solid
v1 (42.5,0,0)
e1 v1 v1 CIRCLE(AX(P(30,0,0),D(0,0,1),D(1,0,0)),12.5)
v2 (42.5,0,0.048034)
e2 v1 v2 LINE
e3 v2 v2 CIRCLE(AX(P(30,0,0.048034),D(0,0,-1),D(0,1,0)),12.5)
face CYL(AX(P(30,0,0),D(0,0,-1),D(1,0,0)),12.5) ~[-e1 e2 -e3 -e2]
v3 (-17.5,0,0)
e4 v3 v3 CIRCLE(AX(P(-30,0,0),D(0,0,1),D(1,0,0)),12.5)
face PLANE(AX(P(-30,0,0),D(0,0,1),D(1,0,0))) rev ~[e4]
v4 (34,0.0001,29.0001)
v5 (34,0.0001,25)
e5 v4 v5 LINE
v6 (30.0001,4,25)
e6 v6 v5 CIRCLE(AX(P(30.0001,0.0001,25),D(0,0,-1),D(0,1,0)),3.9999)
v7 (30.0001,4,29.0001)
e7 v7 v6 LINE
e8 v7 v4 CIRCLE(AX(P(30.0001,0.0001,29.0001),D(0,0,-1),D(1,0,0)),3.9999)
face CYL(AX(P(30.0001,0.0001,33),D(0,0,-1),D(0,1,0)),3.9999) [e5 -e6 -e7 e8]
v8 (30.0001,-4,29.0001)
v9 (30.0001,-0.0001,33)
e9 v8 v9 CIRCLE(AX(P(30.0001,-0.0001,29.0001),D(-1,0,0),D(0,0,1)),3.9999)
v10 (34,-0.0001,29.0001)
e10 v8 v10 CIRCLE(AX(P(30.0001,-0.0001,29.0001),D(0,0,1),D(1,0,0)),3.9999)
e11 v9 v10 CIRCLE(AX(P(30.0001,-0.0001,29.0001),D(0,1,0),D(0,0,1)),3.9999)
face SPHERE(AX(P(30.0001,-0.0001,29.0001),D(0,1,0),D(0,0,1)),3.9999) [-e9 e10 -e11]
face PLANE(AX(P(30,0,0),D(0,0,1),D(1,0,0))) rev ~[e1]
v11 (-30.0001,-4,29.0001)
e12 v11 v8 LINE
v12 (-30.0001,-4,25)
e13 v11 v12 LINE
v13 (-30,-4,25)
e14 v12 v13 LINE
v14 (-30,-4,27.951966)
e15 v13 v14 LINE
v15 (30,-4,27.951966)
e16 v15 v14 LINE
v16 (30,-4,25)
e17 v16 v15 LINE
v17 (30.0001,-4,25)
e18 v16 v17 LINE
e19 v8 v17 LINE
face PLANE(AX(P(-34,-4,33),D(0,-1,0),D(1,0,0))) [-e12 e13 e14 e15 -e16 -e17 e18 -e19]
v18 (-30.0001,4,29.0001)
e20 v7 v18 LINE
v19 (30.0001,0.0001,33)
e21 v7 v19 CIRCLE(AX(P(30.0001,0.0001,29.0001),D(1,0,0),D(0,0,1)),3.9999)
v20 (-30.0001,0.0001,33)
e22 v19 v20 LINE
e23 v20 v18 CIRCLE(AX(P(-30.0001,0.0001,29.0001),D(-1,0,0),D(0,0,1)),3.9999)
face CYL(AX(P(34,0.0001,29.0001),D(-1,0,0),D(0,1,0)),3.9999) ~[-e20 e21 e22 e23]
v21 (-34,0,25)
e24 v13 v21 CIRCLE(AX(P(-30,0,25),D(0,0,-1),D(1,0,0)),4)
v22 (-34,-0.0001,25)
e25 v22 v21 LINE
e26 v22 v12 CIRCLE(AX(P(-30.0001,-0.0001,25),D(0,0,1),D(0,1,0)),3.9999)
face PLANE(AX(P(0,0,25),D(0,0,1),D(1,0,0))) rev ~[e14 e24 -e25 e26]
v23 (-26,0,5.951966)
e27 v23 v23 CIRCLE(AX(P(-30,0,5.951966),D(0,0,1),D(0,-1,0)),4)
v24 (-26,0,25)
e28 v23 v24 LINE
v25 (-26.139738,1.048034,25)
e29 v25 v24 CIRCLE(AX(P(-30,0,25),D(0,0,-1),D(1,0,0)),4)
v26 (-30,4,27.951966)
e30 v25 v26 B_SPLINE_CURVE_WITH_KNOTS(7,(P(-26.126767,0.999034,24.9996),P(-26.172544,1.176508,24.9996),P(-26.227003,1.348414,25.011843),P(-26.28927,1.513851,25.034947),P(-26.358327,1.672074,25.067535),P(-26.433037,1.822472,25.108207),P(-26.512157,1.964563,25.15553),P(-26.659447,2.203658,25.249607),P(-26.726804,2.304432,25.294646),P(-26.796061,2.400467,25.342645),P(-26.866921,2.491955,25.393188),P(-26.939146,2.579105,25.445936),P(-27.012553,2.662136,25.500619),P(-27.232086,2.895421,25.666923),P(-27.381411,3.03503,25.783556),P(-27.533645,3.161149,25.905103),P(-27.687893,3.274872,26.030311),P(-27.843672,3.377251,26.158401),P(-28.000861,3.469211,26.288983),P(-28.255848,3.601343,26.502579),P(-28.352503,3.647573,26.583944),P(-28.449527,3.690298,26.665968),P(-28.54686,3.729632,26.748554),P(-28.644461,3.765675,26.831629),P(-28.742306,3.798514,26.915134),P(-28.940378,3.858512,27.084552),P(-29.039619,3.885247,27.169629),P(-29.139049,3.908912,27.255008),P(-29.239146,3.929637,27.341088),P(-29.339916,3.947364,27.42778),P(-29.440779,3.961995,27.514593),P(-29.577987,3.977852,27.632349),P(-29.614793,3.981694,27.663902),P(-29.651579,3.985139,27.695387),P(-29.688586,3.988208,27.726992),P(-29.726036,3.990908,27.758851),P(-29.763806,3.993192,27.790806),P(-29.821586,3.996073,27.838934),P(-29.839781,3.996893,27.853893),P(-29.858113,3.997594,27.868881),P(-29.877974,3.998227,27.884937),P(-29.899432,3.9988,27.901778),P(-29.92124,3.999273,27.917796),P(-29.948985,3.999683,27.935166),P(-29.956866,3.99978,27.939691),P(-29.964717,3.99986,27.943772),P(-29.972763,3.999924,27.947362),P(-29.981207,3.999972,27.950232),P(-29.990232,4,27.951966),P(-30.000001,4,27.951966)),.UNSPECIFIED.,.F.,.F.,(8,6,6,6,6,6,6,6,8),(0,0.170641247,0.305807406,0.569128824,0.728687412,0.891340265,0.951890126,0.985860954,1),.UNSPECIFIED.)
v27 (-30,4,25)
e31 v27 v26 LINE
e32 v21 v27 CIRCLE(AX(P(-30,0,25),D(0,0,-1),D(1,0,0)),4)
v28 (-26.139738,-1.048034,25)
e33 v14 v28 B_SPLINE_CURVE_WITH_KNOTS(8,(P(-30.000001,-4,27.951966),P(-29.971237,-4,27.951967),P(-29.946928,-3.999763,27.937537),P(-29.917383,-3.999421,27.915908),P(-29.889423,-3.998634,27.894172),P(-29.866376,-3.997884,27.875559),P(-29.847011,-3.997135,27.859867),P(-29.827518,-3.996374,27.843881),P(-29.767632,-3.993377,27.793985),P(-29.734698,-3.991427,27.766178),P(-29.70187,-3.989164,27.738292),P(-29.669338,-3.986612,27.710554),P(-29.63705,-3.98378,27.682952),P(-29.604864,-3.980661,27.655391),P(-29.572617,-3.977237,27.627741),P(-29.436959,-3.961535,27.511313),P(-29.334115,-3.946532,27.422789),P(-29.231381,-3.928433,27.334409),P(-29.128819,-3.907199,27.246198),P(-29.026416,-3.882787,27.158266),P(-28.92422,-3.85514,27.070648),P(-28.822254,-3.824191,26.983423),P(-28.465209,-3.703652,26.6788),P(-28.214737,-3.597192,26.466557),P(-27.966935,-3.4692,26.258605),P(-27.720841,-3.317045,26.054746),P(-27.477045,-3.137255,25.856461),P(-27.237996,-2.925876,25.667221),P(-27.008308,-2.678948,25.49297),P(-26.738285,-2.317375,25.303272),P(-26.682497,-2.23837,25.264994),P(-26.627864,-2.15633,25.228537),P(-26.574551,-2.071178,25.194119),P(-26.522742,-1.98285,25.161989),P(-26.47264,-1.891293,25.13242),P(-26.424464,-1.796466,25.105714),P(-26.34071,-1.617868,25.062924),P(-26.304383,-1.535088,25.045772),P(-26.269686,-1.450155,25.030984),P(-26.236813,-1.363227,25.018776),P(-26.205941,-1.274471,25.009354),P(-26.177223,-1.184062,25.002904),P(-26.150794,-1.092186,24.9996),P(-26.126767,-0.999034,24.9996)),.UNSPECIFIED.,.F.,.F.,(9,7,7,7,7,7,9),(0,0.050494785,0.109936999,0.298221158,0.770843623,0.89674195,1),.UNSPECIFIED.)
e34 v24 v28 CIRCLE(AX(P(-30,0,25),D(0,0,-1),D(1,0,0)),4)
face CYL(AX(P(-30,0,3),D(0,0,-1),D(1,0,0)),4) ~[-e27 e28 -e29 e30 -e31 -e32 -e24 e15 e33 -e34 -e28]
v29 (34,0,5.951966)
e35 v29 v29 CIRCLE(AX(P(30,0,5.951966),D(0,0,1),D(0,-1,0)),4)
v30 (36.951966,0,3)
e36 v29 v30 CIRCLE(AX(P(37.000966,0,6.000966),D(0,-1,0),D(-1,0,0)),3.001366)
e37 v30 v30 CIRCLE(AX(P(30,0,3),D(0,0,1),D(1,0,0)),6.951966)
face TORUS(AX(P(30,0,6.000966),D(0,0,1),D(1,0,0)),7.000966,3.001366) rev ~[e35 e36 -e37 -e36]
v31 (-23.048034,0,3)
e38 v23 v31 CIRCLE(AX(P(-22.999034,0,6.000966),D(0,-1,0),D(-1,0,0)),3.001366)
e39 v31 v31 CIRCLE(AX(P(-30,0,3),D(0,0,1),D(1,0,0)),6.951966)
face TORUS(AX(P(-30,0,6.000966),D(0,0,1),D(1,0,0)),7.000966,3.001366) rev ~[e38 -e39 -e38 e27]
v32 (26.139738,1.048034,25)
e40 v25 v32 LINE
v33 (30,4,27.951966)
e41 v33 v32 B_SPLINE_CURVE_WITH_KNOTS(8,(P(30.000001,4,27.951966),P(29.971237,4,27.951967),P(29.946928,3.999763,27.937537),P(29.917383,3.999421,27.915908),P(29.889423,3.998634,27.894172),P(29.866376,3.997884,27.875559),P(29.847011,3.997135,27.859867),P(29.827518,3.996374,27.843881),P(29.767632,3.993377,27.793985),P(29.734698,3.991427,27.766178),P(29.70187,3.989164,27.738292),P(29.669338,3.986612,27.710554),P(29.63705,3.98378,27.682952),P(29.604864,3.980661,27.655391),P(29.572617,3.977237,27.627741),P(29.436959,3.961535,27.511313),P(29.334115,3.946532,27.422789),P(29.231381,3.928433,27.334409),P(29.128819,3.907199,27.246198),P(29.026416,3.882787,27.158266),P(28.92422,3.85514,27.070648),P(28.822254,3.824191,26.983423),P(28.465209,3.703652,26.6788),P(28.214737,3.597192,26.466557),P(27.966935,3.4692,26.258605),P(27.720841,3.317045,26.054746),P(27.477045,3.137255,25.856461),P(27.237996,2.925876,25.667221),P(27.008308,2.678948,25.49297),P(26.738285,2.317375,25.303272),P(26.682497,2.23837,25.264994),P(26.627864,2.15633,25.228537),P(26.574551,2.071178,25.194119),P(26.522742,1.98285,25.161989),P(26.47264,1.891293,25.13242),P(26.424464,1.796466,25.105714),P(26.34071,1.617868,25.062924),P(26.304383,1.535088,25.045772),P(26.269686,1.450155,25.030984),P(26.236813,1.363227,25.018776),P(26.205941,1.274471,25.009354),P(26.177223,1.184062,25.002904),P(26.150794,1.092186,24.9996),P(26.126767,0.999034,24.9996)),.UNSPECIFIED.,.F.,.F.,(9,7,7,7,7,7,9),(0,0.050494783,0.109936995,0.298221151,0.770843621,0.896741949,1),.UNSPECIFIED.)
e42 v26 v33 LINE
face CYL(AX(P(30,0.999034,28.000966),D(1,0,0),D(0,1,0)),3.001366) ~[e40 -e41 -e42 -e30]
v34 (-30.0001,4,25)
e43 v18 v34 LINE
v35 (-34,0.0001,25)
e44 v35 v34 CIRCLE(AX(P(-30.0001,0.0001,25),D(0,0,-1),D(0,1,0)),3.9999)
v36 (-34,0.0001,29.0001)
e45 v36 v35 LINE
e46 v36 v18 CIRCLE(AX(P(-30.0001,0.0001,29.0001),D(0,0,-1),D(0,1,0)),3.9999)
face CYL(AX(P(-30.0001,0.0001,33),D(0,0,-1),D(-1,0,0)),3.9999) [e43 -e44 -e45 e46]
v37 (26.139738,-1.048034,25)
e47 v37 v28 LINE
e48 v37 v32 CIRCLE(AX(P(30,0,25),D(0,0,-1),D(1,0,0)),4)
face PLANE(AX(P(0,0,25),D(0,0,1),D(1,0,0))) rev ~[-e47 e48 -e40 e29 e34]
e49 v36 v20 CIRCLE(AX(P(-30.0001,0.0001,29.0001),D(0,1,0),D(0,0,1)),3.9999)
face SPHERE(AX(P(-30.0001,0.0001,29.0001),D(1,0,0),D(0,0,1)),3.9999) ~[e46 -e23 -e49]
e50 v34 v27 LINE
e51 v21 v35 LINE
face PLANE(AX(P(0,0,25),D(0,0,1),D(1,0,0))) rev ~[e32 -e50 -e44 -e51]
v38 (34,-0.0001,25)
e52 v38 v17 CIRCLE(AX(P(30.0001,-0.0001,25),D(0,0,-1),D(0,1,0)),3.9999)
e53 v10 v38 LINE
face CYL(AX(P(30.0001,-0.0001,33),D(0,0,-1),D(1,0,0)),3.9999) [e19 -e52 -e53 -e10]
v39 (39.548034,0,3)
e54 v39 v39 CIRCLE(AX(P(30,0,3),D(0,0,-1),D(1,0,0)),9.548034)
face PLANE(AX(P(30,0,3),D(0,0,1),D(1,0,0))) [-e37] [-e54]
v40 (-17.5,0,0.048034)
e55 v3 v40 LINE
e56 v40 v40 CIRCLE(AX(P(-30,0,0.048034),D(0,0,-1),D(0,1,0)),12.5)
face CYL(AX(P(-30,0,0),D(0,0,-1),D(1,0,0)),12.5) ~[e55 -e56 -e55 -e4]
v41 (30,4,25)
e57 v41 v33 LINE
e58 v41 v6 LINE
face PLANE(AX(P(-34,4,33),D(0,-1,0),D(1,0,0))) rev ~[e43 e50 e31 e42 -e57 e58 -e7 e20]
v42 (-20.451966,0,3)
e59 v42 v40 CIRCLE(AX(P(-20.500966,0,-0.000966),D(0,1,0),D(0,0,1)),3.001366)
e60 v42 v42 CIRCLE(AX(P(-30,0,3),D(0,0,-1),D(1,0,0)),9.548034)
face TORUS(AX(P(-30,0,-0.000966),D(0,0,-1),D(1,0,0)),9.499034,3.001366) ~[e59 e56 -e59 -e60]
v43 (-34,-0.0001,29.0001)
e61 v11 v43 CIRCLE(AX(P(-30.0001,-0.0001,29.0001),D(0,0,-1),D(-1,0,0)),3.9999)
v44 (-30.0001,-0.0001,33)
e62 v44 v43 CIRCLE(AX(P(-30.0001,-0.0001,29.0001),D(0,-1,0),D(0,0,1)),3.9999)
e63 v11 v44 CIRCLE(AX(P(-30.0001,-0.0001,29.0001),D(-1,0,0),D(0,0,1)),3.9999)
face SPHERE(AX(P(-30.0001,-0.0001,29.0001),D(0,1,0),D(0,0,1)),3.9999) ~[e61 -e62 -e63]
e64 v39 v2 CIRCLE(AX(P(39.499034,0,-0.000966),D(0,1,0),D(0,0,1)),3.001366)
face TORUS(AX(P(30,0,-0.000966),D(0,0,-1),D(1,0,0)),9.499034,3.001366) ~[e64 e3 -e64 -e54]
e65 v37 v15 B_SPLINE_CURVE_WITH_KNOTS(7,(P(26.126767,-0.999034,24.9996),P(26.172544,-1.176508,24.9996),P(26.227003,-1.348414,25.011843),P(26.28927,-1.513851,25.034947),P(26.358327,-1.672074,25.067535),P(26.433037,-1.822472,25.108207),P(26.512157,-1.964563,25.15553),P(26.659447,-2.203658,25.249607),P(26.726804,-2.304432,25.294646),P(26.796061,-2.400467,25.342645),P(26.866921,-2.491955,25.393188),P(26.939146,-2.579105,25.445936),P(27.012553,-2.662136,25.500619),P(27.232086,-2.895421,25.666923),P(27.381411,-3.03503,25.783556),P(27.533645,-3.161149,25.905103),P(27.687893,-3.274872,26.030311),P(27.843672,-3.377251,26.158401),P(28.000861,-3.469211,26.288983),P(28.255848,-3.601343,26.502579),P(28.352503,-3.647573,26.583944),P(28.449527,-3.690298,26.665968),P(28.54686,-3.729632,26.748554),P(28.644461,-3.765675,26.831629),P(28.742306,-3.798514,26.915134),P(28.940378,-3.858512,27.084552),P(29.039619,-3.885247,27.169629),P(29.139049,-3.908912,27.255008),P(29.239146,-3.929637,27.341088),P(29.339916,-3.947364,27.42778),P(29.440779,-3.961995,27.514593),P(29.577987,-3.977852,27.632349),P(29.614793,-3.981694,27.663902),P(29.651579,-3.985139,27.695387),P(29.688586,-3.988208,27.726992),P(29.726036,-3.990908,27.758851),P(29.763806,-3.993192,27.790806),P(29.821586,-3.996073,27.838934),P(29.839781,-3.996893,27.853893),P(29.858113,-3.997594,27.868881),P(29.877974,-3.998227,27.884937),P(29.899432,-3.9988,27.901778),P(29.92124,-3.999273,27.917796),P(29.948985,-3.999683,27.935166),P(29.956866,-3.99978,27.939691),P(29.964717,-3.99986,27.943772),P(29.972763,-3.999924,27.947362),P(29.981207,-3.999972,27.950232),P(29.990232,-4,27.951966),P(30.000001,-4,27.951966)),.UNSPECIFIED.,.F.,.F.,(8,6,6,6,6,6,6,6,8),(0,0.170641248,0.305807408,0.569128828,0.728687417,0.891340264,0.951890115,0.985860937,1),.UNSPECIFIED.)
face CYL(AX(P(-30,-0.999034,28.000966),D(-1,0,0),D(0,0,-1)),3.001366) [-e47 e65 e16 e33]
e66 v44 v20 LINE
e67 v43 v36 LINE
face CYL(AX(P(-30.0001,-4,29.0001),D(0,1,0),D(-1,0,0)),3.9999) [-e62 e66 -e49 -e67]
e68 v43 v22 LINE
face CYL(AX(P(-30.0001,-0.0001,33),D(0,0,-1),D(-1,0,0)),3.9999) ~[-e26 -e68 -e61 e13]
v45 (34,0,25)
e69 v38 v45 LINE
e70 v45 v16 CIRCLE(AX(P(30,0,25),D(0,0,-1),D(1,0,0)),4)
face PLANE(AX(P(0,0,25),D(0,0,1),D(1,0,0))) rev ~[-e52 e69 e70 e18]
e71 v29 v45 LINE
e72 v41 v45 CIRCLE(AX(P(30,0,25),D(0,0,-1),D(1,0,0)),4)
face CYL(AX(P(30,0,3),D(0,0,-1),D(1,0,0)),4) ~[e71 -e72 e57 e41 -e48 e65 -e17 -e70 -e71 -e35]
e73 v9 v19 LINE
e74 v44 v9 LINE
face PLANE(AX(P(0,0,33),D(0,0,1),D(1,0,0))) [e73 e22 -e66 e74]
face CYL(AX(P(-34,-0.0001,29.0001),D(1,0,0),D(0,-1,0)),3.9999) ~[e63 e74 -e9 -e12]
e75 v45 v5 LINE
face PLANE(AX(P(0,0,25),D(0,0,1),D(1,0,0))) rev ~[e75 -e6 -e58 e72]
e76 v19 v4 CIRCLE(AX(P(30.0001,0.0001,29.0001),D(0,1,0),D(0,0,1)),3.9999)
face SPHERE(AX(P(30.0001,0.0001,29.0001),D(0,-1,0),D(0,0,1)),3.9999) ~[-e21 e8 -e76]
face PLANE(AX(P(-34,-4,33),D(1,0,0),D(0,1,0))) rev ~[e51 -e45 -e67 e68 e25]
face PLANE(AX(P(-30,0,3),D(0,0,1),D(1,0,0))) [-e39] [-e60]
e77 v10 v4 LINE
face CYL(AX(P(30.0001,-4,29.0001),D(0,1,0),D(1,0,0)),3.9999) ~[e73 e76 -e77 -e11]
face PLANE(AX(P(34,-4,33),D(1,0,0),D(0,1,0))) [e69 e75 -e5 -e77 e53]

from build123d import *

# Parameters (mm, degrees)
F0_R         = 12.5
F1_DEPTH     = 3
F2_R         = 4
F3_DEPTH     = 30
F4_W         = 68
F4_H         = 8
F5_DEPTH     = 8
F6_R         = 3.9999
F7_T8_DEPTH  = 60
F7_S9_R      = 4
F7_T10_DEPTH = 32
F7_S11_R     = 4
F7_T12_DEPTH = 32
F7_T16_DEPTH = 60
F7_S17_R     = 4
F7_T18_DEPTH = 32
F7_S19_R     = 4
F7_T20_DEPTH = 32


# Not quite as in the source:
# - a fillet or chamfer that OpenCascade refuses, or shapes differently, is made with other operations: its cross-section is extruded or revolved along the edge and cut away or added
# - two fillets or chamfers of one size are made in one step
# - a fillet or chamfer is up to 0.001 mm smaller than in the source, because OpenCascade refuses the exact size


with BuildPart() as f1:
    # F0 (on Top) → F1 (new body)
    with BuildSketch(Plane.XY):
        with Locations((-30, 0)):
            Circle(F0_R)
    extrude(amount=F1_DEPTH)

    # F2 (on face) → F3 (join)
    with BuildSketch(Plane.XY.offset(3)):
        with Locations((-30, 0)):
            Circle(F2_R)
    extrude(amount=F3_DEPTH)



with BuildPart() as f1b:
    # F0 (on Top) → F1, piece 2 (new body)
    with BuildSketch(Plane.XY):
        with Locations((30, 0)):
            Circle(F0_R)
    extrude(amount=F1_DEPTH)

    # F2 (on face) → F3, piece 2 (join)
    with BuildSketch(Plane.XY.offset(3)):
        with Locations((30, 0)):
            Circle(F2_R)
    extrude(amount=F3_DEPTH)


with BuildPart() as f1_1:
    add(f1.part)

    add(f1b.part)  # F5 merges F1b
    # F4 (on face) → F5 (join)
    with BuildSketch(Plane.XY.offset(33)):
        Rectangle(F4_W, F4_H)
    extrude(amount=-F5_DEPTH)

    # F6 (radius 4 in the source; OpenCascade refuses exactly that, so slightly less here)
    f6_edges = [f1_1.edges().sort_by_distance(p)[0] for p in [
        (34, 0, 33),
        (0, 4, 33),
        (-34, 0, 33),
        (0, -4, 33),
        (34, -4, 29),
        (34, 4, 29),
        (-34, -4, 29),
        (-34, 4, 29),
    ]]
    fillet(f6_edges, radius=F6_R)

    # F7: fillet of radius 3 on 6 edges, made by hand

    # F7_s1 → F7_t2 (revolve)
    with BuildSketch(Plane.XZ):
        with BuildLine():
            ThreePointArc((33.9996, 6.0009656854), (34.8786796564, 3.8786796564), (37.0009656854, 2.9996))
            Line((37.0009656854, 2.9996), (37.0009656854, 2.6994634315))
            ThreePointArc((37.0009656854, 2.6994634315), (35.5004828427, 2.6998634315), (34, 2.6998634315))
            Line((34, 2.6998634315), (33.6998634315, 3))
            ThreePointArc((33.6998634315, 3), (33.6998634315, 4.5004828427), (33.6994634315, 6.0009656854))
            Line((33.6994634315, 6.0009656854), (33.9996, 6.0009656854))
        make_face()
    revolve(axis=Axis((30, 0, 3), (0, 0, 1)))

    # F7_s3 → F7_t4 (revolve)
    with BuildSketch(Plane.XZ):
        with BuildLine():
            ThreePointArc((-26.0004, 6.0009656854), (-25.1213203436, 3.8786796564), (-22.9990343146, 2.9996))
            Line((-22.9990343146, 2.9996), (-22.9990343146, 2.6994634315))
            ThreePointArc((-22.9990343146, 2.6994634315), (-24.4995171573, 2.6998634315), (-26, 2.6998634315))
            Line((-26, 2.6998634315), (-26.3001365685, 3))
            ThreePointArc((-26.3001365685, 3), (-26.3001365685, 4.5004828427), (-26.3005365685, 6.0009656854))
            Line((-26.3005365685, 6.0009656854), (-26.0004, 6.0009656854))
        make_face()
    revolve(axis=Axis((-30, 0, 3), (0, 0, 1)))


with BuildPart() as f7_tool6:
    # F7_s7 → F7_t8 (new body)
    with BuildSketch(Plane.YZ.offset(-30)):
        with BuildLine():
            ThreePointArc((-0.9990343146, 24.9996), (-3.1213203436, 25.8786796564), (-4.0004, 28.0009656854))
            Line((-4.0004, 28.0009656854), (-4.3005365685, 28.0009656854))
            ThreePointArc((-4.3005365685, 28.0009656854), (-4.3001365685, 26.5004828427), (-4.3001365685, 25))
            Line((-4.3001365685, 25), (-4, 24.6998634315))
            ThreePointArc((-4, 24.6998634315), (-2.4995171573, 24.6998634315), (-0.9990343146, 24.6994634315))
            Line((-0.9990343146, 24.6994634315), (-0.9990343146, 24.9996))
        make_face()
    extrude(amount=F7_T8_DEPTH)

    # F7_s9 → F7_t10 (cut, symmetric)
    with BuildSketch(Plane.XY.offset(26.4)):
        with Locations((30, 0)):
            Circle(F7_S9_R)
    extrude(amount=F7_T10_DEPTH, both=True, mode=Mode.SUBTRACT)

    # F7_s11 → F7_t12 (cut, symmetric)
    with BuildSketch(Plane.XY.offset(26.4)):
        with Locations((-30, 0)):
            Circle(F7_S11_R)
    extrude(amount=F7_T12_DEPTH, both=True, mode=Mode.SUBTRACT)


with BuildPart() as f1_2:
    add(f1_1.part)

    # F7_t5: cut F7_tool6
    add(f7_tool6.part, mode=Mode.SUBTRACT)


with BuildPart() as f7_tool14:
    # F7_s15 → F7_t16 (new body)
    with BuildSketch(Plane.YZ.offset(30)):
        with BuildLine():
            ThreePointArc((4.0004, 28.0009656854), (3.1213203436, 25.8786796564), (0.9990343146, 24.9996))
            Line((0.9990343146, 24.9996), (0.9990343146, 24.6994634315))
            ThreePointArc((0.9990343146, 24.6994634315), (2.4995171573, 24.6998634315), (4, 24.6998634315))
            Line((4, 24.6998634315), (4.3001365685, 25))
            ThreePointArc((4.3001365685, 25), (4.3001365685, 26.5004828427), (4.3005365685, 28.0009656854))
            Line((4.3005365685, 28.0009656854), (4.0004, 28.0009656854))
        make_face()
    extrude(amount=-F7_T16_DEPTH)

    # F7_s17 → F7_t18 (cut, symmetric)
    with BuildSketch(Plane.XY.offset(26.4)):
        with Locations((30, 0)):
            Circle(F7_S17_R)
    extrude(amount=F7_T18_DEPTH, both=True, mode=Mode.SUBTRACT)

    # F7_s19 → F7_t20 (cut, symmetric)
    with BuildSketch(Plane.XY.offset(26.4)):
        with Locations((-30, 0)):
            Circle(F7_S19_R)
    extrude(amount=F7_T20_DEPTH, both=True, mode=Mode.SUBTRACT)


with BuildPart() as f1_3:
    add(f1_2.part)

    # F7_t13: cut F7_tool14
    add(f7_tool14.part, mode=Mode.SUBTRACT)

    # F7_s21 → F7_t22 (revolve, cut)
    with BuildSketch(Plane.XZ):
        with BuildLine():
            ThreePointArc((39.4990343146, 3.0004), (41.6213203436, 2.1213203436), (42.5004, -0.0009656854))
            Line((42.5004, -0.0009656854), (42.8005365685, -0.0009656854))
            ThreePointArc((42.8005365685, -0.0009656854), (42.8001365685, 1.4995171573), (42.8001365685, 3))
            Line((42.8001365685, 3), (42.5, 3.3001365685))
            ThreePointArc((42.5, 3.3001365685), (40.9995171573, 3.3001365685), (39.4990343146, 3.3005365685))
            Line((39.4990343146, 3.3005365685), (39.4990343146, 3.0004))
        make_face()
    revolve(axis=Axis((30, 0, 3), (0, 0, 1)), mode=Mode.SUBTRACT)

    # F7_s23 → F7_t24 (revolve, cut)
    with BuildSketch(Plane.XZ):
        with BuildLine():
            ThreePointArc((-20.5009656854, 3.0004), (-18.3786796564, 2.1213203436), (-17.4996, -0.0009656854))
            Line((-17.4996, -0.0009656854), (-17.1994634315, -0.0009656854))
            ThreePointArc((-17.1994634315, -0.0009656854), (-17.1998634315, 1.4995171573), (-17.1998634315, 3))
            Line((-17.1998634315, 3), (-17.5, 3.3001365685))
            ThreePointArc((-17.5, 3.3001365685), (-19.0004828427, 3.3001365685), (-20.5009656854, 3.3005365685))
            Line((-20.5009656854, 3.3005365685), (-20.5009656854, 3.0004))
        make_face()
    revolve(axis=Axis((-30, 0, 3), (0, 0, 1)), mode=Mode.SUBTRACT)


solid = f1_3.part
